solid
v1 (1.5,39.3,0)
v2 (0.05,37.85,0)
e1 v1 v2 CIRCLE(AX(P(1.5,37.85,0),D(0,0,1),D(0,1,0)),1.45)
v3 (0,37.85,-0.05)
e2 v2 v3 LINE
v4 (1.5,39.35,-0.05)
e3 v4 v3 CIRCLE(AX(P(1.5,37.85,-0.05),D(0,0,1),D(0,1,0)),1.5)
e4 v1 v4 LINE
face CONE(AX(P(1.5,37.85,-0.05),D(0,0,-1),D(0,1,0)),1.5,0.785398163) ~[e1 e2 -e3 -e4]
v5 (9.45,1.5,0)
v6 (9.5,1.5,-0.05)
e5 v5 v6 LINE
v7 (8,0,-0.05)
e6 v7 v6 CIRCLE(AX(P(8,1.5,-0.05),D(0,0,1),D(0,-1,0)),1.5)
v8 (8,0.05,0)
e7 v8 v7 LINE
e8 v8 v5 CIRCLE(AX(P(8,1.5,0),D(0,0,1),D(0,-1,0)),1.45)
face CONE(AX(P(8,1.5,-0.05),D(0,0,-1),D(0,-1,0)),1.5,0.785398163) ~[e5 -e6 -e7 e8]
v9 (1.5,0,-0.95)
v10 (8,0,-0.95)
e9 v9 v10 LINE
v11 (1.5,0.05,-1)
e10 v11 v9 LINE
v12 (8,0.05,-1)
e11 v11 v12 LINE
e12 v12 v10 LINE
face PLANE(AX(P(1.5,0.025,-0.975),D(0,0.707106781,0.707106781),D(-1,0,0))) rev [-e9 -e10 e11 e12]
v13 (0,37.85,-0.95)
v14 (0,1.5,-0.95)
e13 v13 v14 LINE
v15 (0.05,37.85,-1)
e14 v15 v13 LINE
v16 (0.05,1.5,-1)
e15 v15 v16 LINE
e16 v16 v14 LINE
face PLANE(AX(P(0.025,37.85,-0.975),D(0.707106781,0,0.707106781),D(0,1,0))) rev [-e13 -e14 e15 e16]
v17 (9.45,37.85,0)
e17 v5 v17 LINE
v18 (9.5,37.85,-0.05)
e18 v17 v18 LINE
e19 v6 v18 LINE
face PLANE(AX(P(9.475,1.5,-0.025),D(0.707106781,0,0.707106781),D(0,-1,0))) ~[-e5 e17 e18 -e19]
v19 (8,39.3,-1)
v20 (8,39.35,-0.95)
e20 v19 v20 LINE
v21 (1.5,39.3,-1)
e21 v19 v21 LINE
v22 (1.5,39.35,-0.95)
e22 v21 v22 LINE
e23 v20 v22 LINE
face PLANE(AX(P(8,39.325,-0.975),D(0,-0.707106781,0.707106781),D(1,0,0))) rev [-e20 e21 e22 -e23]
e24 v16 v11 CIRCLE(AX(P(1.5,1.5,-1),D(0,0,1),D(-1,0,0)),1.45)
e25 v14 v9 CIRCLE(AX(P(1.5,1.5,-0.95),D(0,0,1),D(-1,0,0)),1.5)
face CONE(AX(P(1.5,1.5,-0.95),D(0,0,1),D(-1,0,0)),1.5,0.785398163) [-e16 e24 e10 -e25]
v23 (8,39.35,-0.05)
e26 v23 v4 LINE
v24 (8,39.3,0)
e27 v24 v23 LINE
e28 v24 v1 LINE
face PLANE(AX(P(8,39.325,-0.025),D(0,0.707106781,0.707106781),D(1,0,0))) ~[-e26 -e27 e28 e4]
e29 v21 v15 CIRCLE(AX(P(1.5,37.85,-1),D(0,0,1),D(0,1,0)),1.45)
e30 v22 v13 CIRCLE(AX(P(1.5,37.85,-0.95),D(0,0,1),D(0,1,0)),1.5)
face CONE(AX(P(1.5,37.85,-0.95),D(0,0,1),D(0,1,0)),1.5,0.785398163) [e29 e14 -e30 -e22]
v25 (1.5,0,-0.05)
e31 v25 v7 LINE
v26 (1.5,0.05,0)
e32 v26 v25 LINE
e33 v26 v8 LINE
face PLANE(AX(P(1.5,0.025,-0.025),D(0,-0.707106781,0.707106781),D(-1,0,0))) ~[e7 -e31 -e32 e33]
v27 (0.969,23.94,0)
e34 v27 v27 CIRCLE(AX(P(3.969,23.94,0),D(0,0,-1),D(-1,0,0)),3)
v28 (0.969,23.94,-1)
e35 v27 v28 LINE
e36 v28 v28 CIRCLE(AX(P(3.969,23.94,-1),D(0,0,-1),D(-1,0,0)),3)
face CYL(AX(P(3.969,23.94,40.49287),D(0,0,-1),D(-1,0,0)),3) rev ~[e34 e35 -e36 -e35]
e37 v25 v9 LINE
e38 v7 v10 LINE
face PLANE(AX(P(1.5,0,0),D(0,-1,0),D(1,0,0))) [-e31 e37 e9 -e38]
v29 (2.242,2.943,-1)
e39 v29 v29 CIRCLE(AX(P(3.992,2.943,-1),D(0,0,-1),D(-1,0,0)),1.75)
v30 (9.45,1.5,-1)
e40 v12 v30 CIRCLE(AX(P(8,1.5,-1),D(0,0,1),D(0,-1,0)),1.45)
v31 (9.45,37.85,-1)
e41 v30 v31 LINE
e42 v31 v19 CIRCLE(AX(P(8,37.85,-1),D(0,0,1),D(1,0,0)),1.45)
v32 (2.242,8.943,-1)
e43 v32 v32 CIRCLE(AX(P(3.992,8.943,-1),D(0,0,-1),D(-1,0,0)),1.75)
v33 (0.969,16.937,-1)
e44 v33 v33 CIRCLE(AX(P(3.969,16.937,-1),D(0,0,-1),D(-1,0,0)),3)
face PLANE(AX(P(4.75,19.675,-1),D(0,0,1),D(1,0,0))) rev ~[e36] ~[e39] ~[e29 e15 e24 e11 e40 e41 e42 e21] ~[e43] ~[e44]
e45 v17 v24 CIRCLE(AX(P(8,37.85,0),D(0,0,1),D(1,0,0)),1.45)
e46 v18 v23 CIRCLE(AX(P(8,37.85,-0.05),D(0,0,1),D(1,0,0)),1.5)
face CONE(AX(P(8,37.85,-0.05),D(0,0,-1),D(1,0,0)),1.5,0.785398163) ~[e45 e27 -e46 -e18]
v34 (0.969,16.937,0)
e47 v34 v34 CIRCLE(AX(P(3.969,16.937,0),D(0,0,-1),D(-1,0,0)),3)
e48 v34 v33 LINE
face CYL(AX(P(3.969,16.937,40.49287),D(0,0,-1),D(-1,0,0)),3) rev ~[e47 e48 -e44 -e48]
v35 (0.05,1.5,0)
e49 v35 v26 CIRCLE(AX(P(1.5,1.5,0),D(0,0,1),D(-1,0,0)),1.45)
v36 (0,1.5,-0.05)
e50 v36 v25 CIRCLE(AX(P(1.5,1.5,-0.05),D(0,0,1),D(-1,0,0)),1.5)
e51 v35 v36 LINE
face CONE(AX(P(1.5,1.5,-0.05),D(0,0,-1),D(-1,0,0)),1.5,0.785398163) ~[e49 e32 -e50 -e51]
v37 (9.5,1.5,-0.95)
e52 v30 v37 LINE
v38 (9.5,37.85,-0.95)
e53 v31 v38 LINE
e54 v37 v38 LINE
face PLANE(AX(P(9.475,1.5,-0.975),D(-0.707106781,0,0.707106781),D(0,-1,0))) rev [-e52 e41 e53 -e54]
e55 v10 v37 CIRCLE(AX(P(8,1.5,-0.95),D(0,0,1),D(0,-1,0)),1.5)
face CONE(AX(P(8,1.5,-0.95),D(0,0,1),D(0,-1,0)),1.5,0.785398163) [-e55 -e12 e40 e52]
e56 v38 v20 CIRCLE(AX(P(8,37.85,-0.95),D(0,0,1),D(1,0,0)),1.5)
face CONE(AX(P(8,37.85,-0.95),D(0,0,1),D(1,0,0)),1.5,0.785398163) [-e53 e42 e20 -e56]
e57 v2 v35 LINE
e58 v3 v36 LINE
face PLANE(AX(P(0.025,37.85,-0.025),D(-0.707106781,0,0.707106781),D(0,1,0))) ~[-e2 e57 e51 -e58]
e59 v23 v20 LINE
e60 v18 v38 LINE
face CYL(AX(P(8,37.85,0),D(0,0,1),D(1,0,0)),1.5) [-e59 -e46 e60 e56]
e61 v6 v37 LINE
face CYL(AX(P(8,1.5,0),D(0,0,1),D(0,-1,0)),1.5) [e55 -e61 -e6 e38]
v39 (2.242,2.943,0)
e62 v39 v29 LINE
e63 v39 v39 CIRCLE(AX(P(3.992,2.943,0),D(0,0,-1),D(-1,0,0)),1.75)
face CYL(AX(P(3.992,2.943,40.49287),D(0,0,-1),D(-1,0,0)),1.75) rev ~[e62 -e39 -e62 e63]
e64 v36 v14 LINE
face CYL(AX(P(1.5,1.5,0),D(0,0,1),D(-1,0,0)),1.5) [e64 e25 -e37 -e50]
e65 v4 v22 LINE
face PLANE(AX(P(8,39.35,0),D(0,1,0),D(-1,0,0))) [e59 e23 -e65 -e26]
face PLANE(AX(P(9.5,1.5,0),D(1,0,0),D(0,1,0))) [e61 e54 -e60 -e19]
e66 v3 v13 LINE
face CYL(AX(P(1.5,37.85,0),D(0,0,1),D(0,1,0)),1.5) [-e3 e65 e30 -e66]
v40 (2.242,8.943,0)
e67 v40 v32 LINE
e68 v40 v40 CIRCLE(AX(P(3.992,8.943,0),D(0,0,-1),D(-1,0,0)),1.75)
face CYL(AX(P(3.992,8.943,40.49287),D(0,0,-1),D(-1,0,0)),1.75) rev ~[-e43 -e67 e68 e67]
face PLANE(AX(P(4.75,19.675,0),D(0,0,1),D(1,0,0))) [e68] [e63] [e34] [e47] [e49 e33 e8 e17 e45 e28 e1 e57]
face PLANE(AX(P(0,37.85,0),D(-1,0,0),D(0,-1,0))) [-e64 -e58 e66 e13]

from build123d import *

# Parameters (mm, degrees)
F1_DEPTH = 1
F3_D     = 3.5
F5_D     = 6
F6_SIZE  = 0.05


with BuildPart() as f1:
    # F0 (on Top) → F1 (new body)
    with BuildSketch(Plane.XY):
        with BuildLine():
            Line((0, 37.85), (0, 1.5))
            ThreePointArc((0, 1.5), (0.4393398282, 0.4393398282), (1.5, 0))
            Line((1.5, 0), (8, 0))
            ThreePointArc((8, 0), (9.0606601718, 0.4393398282), (9.5, 1.5))
            Line((9.5, 1.5), (9.5, 37.85))
            ThreePointArc((9.5, 37.85), (9.0606601718, 38.9106601718), (8, 39.35))
            Line((8, 39.35), (1.5, 39.35))
            ThreePointArc((1.5, 39.35), (0.4393398282, 38.9106601718), (0, 37.85))
        make_face()
    extrude(amount=-F1_DEPTH)

    # F3 (through all)
    with Locations(Plane.XY):
        with Locations((3.992, 8.943), (3.992, 2.943)):
            Hole(F3_D / 2)

    # F5 (through all)
    with Locations(Plane.XY):
        with Locations((3.969, 23.94), (3.969, 16.937)):
            Hole(F5_D / 2)

    # F6
    f6_edges = [f1.edges().sort_by_distance(p)[0] for p in [
        (9.5, 19.675, 0),
        (0, 19.675, 0),
        (4.75, 0, -1),
        (4.75, 0, 0),
        (9.5, 19.675, -1),
        (4.75, 39.35, 0),
        (0, 19.675, -1),
        (4.75, 39.35, -1),
        (0.43934, 38.91066, 0),
        (0.43934, 38.91066, -1),
        (0.43934, 0.43934, 0),
        (0.43934, 0.43934, -1),
        (9.06066, 38.91066, 0),
        (9.06066, 0.43934, 0),
        (9.06066, 38.91066, -1),
        (9.06066, 0.43934, -1),
    ]]
    chamfer(f6_edges, length=F6_SIZE)


solid = f1.part
